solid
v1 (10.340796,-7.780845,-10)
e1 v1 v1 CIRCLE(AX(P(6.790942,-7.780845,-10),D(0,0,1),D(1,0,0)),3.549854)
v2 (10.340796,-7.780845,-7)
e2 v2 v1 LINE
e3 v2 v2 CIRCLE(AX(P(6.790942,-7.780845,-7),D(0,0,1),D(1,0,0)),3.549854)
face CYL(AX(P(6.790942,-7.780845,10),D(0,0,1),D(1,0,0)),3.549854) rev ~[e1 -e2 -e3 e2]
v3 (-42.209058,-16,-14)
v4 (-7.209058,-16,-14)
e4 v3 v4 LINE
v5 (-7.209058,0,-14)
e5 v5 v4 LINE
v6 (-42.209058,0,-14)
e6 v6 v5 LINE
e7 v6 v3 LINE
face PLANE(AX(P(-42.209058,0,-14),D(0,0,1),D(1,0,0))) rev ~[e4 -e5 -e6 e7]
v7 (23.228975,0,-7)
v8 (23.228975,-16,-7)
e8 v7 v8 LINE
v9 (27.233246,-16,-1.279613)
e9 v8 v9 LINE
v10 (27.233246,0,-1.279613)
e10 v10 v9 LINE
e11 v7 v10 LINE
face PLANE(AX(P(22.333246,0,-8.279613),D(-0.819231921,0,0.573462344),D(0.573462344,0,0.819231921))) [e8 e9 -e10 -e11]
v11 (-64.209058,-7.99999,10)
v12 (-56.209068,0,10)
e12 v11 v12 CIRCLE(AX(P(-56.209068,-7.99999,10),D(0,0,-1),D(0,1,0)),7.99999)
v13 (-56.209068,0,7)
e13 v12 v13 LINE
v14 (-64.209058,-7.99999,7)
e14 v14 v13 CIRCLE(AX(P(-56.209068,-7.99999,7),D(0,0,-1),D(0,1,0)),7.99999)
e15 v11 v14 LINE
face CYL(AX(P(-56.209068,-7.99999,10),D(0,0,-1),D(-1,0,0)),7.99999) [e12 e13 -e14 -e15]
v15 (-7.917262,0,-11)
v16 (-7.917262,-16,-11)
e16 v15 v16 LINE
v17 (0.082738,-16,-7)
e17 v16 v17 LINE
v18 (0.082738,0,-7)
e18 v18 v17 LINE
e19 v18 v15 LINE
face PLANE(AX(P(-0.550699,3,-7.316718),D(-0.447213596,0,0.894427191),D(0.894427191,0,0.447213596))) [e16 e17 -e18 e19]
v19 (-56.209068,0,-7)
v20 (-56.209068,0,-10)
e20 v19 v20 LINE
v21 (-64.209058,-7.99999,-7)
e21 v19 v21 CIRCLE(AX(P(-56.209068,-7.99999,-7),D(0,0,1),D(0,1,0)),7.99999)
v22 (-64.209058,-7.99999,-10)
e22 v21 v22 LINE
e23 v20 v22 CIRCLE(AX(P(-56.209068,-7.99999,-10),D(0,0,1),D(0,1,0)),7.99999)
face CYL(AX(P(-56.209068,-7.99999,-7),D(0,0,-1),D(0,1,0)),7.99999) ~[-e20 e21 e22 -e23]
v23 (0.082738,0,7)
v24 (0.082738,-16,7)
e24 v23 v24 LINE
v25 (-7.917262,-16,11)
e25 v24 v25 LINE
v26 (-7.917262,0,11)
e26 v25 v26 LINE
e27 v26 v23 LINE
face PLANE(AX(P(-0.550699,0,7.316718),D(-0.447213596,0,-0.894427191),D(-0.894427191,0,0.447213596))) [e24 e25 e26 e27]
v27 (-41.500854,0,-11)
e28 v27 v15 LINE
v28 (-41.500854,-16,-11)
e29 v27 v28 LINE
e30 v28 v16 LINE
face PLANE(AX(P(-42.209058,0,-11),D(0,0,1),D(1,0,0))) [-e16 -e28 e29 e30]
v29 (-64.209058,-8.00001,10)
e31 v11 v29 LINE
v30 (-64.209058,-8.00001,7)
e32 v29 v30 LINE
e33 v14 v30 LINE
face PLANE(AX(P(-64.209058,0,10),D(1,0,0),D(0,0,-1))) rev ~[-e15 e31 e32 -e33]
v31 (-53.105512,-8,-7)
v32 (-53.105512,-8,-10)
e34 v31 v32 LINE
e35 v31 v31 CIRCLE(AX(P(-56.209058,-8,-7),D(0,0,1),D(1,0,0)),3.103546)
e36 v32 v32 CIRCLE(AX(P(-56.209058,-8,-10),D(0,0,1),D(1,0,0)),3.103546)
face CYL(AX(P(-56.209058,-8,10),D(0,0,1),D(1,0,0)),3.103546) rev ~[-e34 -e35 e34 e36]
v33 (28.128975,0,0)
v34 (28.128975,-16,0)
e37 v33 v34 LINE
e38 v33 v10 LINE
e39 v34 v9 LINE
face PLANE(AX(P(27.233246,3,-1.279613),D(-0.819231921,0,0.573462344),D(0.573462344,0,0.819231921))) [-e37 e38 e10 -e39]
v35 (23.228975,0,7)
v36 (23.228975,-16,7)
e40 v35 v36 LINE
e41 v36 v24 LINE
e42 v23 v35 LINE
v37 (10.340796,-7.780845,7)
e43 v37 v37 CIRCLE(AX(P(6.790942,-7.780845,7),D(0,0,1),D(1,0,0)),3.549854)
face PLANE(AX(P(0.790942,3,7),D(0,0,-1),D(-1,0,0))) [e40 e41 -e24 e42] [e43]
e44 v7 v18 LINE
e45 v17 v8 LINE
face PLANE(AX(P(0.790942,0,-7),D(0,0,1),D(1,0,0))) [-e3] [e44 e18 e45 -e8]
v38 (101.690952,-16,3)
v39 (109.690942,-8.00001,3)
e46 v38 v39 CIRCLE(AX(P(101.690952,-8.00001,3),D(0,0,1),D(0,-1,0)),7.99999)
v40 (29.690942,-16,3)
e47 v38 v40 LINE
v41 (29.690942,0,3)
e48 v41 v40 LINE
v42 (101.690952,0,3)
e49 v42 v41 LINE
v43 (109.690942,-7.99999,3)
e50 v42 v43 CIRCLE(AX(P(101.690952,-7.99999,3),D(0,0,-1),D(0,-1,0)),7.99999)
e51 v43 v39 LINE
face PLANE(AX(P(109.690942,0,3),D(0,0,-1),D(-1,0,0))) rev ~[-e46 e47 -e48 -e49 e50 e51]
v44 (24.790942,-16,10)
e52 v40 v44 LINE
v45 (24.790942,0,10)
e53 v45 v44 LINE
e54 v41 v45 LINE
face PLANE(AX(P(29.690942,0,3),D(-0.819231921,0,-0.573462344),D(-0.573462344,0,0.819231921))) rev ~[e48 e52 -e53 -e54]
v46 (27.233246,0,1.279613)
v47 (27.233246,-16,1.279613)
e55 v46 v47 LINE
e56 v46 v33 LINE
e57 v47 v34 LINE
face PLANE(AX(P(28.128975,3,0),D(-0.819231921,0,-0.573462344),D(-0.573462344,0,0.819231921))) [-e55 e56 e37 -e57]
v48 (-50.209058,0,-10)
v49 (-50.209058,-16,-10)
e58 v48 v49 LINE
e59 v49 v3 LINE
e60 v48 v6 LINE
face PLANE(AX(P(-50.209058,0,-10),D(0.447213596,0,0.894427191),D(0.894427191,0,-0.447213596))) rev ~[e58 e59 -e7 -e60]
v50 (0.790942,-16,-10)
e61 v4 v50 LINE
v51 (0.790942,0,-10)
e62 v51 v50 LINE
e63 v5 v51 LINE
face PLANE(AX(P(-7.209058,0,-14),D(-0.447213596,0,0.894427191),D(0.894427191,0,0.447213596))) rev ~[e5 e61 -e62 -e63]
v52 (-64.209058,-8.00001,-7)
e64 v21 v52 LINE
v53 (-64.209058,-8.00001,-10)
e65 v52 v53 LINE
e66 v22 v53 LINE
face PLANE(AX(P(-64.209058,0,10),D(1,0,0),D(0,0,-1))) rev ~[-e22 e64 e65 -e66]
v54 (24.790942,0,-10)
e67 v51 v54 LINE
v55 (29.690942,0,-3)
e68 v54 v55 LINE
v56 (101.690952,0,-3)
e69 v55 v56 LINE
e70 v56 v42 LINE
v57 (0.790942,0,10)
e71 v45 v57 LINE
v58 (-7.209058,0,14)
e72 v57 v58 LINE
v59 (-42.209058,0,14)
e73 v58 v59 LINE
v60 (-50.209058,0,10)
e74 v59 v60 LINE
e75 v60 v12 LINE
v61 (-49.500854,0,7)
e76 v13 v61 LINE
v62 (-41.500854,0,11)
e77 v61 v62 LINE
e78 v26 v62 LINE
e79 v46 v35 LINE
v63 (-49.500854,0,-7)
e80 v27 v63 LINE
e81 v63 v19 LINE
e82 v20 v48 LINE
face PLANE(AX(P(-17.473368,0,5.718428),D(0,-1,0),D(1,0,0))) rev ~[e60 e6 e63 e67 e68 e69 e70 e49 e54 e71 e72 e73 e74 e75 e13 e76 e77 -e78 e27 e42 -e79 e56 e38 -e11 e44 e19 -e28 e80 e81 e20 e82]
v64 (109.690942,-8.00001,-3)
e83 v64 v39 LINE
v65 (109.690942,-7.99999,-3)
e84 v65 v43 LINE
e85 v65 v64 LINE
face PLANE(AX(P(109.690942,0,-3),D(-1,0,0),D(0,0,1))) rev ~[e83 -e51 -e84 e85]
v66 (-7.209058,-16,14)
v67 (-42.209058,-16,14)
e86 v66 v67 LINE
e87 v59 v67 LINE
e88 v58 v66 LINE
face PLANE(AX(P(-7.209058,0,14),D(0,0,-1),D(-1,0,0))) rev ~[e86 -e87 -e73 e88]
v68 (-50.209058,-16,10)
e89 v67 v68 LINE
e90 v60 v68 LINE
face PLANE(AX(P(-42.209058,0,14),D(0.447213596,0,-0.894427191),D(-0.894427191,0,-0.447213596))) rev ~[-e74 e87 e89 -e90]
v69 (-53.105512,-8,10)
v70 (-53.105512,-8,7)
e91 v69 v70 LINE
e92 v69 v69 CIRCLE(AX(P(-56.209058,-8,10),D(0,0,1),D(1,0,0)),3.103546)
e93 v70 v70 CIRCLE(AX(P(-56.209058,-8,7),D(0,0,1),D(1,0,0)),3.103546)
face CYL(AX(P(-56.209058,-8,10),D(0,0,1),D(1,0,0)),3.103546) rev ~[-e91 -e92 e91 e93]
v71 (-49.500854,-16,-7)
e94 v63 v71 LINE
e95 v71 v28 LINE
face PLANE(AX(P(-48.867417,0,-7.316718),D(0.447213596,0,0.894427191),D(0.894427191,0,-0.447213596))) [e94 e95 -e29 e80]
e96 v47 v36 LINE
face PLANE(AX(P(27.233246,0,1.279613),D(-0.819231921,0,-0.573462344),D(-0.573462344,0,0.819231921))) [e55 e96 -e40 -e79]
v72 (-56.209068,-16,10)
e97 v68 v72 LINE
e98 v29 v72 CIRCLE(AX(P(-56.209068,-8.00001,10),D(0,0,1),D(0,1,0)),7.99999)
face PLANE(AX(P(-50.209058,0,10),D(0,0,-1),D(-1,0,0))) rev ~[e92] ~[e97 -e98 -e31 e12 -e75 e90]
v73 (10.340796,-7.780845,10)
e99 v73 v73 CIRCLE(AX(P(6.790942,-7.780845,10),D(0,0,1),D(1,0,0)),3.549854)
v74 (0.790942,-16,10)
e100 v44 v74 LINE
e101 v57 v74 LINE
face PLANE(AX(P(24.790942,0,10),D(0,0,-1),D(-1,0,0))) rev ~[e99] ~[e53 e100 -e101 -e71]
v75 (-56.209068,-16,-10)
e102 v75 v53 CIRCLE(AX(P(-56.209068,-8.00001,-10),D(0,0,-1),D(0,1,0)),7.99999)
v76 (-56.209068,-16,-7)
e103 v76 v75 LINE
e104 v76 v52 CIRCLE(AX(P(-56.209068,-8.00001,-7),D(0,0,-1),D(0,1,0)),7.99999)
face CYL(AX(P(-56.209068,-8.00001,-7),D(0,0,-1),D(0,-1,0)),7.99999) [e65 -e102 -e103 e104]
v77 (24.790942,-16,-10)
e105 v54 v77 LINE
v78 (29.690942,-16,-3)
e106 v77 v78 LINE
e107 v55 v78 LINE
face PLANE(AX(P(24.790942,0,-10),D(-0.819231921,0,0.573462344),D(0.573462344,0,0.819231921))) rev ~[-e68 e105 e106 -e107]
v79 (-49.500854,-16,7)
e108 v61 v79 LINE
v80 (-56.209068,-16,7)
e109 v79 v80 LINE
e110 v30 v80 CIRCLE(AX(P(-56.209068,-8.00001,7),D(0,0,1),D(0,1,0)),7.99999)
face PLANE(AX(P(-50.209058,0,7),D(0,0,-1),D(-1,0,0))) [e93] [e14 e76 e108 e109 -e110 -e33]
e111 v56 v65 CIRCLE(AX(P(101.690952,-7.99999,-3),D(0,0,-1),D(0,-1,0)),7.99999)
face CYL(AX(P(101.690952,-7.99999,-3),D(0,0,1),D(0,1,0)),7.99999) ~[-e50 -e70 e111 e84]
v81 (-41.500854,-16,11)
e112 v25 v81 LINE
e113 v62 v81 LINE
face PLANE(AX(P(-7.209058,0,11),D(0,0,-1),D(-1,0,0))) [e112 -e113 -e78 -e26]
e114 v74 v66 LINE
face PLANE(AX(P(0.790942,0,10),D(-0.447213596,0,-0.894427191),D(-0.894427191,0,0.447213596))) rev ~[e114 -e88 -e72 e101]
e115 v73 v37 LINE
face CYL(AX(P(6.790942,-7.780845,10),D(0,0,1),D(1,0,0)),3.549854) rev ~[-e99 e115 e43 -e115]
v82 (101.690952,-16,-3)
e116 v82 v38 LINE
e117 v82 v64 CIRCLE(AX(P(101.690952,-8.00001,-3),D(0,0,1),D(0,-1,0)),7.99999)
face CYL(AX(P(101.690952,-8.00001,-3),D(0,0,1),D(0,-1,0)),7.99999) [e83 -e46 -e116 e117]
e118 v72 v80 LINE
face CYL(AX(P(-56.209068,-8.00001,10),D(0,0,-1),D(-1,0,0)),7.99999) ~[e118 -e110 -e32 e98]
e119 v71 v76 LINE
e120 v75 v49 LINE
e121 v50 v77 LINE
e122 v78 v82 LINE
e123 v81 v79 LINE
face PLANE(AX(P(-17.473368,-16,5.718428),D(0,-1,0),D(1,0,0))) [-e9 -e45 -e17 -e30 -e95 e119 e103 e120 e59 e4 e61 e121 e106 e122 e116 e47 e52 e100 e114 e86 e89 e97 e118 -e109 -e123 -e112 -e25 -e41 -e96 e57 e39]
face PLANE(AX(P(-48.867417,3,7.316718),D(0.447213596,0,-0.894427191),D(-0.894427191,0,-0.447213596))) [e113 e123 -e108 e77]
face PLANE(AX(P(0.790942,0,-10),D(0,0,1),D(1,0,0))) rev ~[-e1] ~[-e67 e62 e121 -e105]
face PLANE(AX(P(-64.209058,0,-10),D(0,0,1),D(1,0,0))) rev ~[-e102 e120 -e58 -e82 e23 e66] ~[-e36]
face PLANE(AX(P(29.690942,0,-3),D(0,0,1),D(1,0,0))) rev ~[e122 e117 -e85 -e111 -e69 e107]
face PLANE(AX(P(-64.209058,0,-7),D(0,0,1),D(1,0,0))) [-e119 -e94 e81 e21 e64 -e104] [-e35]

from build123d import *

# Parameters (mm, degrees)
F1_DEPTH    = 16
F2_T        = 3
F2_T3_DEPTH = 22
F3_R        = 7.99999
F4_R        = 3.1035458613
F4_R_2      = 3.5498541614
F5_DEPTH    = 20


# Not quite as in the source:
# - a fillet or chamfer is up to 0.001 mm smaller than in the source, because OpenCascade refuses the exact size
# - a shell that OpenCascade refuses in one call is made with other operations: the cavity is built on its own and cut out


with BuildPart() as f1:
    # F0 (on Front) → F1 (new body)
    with BuildSketch(Plane.XZ):
        Polygon((-64.2090581298, 10), (-64.2090581298, 0), (31.7909418702, 0), (29.6909418702, 3), (24.7909418702, 10), (0.7909418702, 10), (-7.2090581298, 14), (-42.2090581298, 14), (-50.2090581298, 10), align=None)
        Polygon((31.7909418702, 0), (-64.2090581298, 0), (-64.2090581298, -10), (-50.2090581298, -10), (-42.2090581298, -14), (-7.2090581298, -14), (0.7909418702, -10), (24.7909418702, -10), (29.6909418702, -3), align=None)
        Polygon((29.6909418702, 3), (31.7909418702, 0), (29.6909418702, -3), (109.6909418702, -3), (109.6909418702, 3), align=None)
    extrude(amount=F1_DEPTH)

    # F2: shell of thickness 3, made by hand


with BuildPart() as f2_core1:
    # F2_t2: copy of F1
    add(f1.part)

    # the walls: a layer under each face that stays
    f2_faces = [f2_core1.faces().sort_by_distance(p)[0] for p in [
        (-24.7090581298, -8, 14),
        (-46.2090581298, -8, 12),
        (-57.2090581298, -8, 10),
        (-57.2090581298, -8, -10),
        (-46.2090581298, -8, -12),
        (-24.7090581298, -8, -14),
        (-3.2090581298, -8, -12),
        (12.7909418702, -8, -10),
        (27.2409418702, -8, -6.5),
        (69.6909418702, -8, -3),
        (109.6909418702, -8, 0),
        (69.6909418702, -8, 3),
        (27.2409418702, -8, 6.5),
        (12.7909418702, -8, 10),
        (-3.2090581298, -8, 12),
    ]]
    thicken(f2_faces, amount=-F2_T, mode=Mode.SUBTRACT)

    # F2_s4 → F2_t3 (cut)
    with BuildSketch(Plane.XZ.offset(-3)):
        Polygon((-50.2224745377, 10.0568328157), (-48.8674173433, 7.316718427), (-49.5008541973, 7), (-50.2090581298, 7), align=None)
        Polygon((-50.2224745377, -10.0568328157), (-50.2090581298, -7), (-49.5008541973, -7), (-48.8674173433, -7.316718427), align=None)
        Polygon((0.8043582781, -10.0568328157), (-0.5506989163, -7.316718427), (0.0827379377, -7), (0.7909418702, -7), align=None)
        Polygon((29.7155188278, -3.0472038703), (27.2332461087, -1.2796129669), (28.1289751855, 0), (29.6909418702, 0), align=None)
        Polygon((29.7155188278, 3.0472038703), (29.6909418702, 0), (28.1289751855, 0), (27.2332461087, 1.2796129669), align=None)
        Polygon((0.8043582781, 10.0568328157), (0.7909418702, 7), (0.0827379377, 7), (-0.5506989163, 7.316718427), align=None)
    extrude(amount=F2_T3_DEPTH, mode=Mode.SUBTRACT)


with BuildPart() as f1_1:
    add(f1.part)

    # what is left inside the walls is the cavity
    f2_cavity = [f2_core1.part.solids().sort_by_distance(p)[0] for p in [
        (-18.040041, -15.97, -3.666667),
    ]]
    add(f2_cavity, mode=Mode.SUBTRACT)

    # F3 (radius 8 in the source; OpenCascade refuses exactly that, so slightly less here)
    f3_edges = [f1_1.edges().sort_by_distance(p)[0] for p in [
        (-64.209058, -16, -8.5),
        (-64.209058, -16, 8.5),
        (-64.209058, 0, -8.5),
        (-64.209058, 0, 8.5),
        (109.690942, -16, 0),
        (109.690942, 0, 0),
    ]]
    fillet(f3_edges, radius=F3_R)

    # F4 (on face) → F5 (cut)
    with BuildSketch(Plane.XY.offset(10)):
        with Locations((-56.2090581298, -8)):
            Circle(F4_R)
        with Locations((6.7909418702, -7.7808454374)):
            Circle(F4_R_2)
    extrude(amount=-F5_DEPTH, mode=Mode.SUBTRACT)


solid = f1_1.part
